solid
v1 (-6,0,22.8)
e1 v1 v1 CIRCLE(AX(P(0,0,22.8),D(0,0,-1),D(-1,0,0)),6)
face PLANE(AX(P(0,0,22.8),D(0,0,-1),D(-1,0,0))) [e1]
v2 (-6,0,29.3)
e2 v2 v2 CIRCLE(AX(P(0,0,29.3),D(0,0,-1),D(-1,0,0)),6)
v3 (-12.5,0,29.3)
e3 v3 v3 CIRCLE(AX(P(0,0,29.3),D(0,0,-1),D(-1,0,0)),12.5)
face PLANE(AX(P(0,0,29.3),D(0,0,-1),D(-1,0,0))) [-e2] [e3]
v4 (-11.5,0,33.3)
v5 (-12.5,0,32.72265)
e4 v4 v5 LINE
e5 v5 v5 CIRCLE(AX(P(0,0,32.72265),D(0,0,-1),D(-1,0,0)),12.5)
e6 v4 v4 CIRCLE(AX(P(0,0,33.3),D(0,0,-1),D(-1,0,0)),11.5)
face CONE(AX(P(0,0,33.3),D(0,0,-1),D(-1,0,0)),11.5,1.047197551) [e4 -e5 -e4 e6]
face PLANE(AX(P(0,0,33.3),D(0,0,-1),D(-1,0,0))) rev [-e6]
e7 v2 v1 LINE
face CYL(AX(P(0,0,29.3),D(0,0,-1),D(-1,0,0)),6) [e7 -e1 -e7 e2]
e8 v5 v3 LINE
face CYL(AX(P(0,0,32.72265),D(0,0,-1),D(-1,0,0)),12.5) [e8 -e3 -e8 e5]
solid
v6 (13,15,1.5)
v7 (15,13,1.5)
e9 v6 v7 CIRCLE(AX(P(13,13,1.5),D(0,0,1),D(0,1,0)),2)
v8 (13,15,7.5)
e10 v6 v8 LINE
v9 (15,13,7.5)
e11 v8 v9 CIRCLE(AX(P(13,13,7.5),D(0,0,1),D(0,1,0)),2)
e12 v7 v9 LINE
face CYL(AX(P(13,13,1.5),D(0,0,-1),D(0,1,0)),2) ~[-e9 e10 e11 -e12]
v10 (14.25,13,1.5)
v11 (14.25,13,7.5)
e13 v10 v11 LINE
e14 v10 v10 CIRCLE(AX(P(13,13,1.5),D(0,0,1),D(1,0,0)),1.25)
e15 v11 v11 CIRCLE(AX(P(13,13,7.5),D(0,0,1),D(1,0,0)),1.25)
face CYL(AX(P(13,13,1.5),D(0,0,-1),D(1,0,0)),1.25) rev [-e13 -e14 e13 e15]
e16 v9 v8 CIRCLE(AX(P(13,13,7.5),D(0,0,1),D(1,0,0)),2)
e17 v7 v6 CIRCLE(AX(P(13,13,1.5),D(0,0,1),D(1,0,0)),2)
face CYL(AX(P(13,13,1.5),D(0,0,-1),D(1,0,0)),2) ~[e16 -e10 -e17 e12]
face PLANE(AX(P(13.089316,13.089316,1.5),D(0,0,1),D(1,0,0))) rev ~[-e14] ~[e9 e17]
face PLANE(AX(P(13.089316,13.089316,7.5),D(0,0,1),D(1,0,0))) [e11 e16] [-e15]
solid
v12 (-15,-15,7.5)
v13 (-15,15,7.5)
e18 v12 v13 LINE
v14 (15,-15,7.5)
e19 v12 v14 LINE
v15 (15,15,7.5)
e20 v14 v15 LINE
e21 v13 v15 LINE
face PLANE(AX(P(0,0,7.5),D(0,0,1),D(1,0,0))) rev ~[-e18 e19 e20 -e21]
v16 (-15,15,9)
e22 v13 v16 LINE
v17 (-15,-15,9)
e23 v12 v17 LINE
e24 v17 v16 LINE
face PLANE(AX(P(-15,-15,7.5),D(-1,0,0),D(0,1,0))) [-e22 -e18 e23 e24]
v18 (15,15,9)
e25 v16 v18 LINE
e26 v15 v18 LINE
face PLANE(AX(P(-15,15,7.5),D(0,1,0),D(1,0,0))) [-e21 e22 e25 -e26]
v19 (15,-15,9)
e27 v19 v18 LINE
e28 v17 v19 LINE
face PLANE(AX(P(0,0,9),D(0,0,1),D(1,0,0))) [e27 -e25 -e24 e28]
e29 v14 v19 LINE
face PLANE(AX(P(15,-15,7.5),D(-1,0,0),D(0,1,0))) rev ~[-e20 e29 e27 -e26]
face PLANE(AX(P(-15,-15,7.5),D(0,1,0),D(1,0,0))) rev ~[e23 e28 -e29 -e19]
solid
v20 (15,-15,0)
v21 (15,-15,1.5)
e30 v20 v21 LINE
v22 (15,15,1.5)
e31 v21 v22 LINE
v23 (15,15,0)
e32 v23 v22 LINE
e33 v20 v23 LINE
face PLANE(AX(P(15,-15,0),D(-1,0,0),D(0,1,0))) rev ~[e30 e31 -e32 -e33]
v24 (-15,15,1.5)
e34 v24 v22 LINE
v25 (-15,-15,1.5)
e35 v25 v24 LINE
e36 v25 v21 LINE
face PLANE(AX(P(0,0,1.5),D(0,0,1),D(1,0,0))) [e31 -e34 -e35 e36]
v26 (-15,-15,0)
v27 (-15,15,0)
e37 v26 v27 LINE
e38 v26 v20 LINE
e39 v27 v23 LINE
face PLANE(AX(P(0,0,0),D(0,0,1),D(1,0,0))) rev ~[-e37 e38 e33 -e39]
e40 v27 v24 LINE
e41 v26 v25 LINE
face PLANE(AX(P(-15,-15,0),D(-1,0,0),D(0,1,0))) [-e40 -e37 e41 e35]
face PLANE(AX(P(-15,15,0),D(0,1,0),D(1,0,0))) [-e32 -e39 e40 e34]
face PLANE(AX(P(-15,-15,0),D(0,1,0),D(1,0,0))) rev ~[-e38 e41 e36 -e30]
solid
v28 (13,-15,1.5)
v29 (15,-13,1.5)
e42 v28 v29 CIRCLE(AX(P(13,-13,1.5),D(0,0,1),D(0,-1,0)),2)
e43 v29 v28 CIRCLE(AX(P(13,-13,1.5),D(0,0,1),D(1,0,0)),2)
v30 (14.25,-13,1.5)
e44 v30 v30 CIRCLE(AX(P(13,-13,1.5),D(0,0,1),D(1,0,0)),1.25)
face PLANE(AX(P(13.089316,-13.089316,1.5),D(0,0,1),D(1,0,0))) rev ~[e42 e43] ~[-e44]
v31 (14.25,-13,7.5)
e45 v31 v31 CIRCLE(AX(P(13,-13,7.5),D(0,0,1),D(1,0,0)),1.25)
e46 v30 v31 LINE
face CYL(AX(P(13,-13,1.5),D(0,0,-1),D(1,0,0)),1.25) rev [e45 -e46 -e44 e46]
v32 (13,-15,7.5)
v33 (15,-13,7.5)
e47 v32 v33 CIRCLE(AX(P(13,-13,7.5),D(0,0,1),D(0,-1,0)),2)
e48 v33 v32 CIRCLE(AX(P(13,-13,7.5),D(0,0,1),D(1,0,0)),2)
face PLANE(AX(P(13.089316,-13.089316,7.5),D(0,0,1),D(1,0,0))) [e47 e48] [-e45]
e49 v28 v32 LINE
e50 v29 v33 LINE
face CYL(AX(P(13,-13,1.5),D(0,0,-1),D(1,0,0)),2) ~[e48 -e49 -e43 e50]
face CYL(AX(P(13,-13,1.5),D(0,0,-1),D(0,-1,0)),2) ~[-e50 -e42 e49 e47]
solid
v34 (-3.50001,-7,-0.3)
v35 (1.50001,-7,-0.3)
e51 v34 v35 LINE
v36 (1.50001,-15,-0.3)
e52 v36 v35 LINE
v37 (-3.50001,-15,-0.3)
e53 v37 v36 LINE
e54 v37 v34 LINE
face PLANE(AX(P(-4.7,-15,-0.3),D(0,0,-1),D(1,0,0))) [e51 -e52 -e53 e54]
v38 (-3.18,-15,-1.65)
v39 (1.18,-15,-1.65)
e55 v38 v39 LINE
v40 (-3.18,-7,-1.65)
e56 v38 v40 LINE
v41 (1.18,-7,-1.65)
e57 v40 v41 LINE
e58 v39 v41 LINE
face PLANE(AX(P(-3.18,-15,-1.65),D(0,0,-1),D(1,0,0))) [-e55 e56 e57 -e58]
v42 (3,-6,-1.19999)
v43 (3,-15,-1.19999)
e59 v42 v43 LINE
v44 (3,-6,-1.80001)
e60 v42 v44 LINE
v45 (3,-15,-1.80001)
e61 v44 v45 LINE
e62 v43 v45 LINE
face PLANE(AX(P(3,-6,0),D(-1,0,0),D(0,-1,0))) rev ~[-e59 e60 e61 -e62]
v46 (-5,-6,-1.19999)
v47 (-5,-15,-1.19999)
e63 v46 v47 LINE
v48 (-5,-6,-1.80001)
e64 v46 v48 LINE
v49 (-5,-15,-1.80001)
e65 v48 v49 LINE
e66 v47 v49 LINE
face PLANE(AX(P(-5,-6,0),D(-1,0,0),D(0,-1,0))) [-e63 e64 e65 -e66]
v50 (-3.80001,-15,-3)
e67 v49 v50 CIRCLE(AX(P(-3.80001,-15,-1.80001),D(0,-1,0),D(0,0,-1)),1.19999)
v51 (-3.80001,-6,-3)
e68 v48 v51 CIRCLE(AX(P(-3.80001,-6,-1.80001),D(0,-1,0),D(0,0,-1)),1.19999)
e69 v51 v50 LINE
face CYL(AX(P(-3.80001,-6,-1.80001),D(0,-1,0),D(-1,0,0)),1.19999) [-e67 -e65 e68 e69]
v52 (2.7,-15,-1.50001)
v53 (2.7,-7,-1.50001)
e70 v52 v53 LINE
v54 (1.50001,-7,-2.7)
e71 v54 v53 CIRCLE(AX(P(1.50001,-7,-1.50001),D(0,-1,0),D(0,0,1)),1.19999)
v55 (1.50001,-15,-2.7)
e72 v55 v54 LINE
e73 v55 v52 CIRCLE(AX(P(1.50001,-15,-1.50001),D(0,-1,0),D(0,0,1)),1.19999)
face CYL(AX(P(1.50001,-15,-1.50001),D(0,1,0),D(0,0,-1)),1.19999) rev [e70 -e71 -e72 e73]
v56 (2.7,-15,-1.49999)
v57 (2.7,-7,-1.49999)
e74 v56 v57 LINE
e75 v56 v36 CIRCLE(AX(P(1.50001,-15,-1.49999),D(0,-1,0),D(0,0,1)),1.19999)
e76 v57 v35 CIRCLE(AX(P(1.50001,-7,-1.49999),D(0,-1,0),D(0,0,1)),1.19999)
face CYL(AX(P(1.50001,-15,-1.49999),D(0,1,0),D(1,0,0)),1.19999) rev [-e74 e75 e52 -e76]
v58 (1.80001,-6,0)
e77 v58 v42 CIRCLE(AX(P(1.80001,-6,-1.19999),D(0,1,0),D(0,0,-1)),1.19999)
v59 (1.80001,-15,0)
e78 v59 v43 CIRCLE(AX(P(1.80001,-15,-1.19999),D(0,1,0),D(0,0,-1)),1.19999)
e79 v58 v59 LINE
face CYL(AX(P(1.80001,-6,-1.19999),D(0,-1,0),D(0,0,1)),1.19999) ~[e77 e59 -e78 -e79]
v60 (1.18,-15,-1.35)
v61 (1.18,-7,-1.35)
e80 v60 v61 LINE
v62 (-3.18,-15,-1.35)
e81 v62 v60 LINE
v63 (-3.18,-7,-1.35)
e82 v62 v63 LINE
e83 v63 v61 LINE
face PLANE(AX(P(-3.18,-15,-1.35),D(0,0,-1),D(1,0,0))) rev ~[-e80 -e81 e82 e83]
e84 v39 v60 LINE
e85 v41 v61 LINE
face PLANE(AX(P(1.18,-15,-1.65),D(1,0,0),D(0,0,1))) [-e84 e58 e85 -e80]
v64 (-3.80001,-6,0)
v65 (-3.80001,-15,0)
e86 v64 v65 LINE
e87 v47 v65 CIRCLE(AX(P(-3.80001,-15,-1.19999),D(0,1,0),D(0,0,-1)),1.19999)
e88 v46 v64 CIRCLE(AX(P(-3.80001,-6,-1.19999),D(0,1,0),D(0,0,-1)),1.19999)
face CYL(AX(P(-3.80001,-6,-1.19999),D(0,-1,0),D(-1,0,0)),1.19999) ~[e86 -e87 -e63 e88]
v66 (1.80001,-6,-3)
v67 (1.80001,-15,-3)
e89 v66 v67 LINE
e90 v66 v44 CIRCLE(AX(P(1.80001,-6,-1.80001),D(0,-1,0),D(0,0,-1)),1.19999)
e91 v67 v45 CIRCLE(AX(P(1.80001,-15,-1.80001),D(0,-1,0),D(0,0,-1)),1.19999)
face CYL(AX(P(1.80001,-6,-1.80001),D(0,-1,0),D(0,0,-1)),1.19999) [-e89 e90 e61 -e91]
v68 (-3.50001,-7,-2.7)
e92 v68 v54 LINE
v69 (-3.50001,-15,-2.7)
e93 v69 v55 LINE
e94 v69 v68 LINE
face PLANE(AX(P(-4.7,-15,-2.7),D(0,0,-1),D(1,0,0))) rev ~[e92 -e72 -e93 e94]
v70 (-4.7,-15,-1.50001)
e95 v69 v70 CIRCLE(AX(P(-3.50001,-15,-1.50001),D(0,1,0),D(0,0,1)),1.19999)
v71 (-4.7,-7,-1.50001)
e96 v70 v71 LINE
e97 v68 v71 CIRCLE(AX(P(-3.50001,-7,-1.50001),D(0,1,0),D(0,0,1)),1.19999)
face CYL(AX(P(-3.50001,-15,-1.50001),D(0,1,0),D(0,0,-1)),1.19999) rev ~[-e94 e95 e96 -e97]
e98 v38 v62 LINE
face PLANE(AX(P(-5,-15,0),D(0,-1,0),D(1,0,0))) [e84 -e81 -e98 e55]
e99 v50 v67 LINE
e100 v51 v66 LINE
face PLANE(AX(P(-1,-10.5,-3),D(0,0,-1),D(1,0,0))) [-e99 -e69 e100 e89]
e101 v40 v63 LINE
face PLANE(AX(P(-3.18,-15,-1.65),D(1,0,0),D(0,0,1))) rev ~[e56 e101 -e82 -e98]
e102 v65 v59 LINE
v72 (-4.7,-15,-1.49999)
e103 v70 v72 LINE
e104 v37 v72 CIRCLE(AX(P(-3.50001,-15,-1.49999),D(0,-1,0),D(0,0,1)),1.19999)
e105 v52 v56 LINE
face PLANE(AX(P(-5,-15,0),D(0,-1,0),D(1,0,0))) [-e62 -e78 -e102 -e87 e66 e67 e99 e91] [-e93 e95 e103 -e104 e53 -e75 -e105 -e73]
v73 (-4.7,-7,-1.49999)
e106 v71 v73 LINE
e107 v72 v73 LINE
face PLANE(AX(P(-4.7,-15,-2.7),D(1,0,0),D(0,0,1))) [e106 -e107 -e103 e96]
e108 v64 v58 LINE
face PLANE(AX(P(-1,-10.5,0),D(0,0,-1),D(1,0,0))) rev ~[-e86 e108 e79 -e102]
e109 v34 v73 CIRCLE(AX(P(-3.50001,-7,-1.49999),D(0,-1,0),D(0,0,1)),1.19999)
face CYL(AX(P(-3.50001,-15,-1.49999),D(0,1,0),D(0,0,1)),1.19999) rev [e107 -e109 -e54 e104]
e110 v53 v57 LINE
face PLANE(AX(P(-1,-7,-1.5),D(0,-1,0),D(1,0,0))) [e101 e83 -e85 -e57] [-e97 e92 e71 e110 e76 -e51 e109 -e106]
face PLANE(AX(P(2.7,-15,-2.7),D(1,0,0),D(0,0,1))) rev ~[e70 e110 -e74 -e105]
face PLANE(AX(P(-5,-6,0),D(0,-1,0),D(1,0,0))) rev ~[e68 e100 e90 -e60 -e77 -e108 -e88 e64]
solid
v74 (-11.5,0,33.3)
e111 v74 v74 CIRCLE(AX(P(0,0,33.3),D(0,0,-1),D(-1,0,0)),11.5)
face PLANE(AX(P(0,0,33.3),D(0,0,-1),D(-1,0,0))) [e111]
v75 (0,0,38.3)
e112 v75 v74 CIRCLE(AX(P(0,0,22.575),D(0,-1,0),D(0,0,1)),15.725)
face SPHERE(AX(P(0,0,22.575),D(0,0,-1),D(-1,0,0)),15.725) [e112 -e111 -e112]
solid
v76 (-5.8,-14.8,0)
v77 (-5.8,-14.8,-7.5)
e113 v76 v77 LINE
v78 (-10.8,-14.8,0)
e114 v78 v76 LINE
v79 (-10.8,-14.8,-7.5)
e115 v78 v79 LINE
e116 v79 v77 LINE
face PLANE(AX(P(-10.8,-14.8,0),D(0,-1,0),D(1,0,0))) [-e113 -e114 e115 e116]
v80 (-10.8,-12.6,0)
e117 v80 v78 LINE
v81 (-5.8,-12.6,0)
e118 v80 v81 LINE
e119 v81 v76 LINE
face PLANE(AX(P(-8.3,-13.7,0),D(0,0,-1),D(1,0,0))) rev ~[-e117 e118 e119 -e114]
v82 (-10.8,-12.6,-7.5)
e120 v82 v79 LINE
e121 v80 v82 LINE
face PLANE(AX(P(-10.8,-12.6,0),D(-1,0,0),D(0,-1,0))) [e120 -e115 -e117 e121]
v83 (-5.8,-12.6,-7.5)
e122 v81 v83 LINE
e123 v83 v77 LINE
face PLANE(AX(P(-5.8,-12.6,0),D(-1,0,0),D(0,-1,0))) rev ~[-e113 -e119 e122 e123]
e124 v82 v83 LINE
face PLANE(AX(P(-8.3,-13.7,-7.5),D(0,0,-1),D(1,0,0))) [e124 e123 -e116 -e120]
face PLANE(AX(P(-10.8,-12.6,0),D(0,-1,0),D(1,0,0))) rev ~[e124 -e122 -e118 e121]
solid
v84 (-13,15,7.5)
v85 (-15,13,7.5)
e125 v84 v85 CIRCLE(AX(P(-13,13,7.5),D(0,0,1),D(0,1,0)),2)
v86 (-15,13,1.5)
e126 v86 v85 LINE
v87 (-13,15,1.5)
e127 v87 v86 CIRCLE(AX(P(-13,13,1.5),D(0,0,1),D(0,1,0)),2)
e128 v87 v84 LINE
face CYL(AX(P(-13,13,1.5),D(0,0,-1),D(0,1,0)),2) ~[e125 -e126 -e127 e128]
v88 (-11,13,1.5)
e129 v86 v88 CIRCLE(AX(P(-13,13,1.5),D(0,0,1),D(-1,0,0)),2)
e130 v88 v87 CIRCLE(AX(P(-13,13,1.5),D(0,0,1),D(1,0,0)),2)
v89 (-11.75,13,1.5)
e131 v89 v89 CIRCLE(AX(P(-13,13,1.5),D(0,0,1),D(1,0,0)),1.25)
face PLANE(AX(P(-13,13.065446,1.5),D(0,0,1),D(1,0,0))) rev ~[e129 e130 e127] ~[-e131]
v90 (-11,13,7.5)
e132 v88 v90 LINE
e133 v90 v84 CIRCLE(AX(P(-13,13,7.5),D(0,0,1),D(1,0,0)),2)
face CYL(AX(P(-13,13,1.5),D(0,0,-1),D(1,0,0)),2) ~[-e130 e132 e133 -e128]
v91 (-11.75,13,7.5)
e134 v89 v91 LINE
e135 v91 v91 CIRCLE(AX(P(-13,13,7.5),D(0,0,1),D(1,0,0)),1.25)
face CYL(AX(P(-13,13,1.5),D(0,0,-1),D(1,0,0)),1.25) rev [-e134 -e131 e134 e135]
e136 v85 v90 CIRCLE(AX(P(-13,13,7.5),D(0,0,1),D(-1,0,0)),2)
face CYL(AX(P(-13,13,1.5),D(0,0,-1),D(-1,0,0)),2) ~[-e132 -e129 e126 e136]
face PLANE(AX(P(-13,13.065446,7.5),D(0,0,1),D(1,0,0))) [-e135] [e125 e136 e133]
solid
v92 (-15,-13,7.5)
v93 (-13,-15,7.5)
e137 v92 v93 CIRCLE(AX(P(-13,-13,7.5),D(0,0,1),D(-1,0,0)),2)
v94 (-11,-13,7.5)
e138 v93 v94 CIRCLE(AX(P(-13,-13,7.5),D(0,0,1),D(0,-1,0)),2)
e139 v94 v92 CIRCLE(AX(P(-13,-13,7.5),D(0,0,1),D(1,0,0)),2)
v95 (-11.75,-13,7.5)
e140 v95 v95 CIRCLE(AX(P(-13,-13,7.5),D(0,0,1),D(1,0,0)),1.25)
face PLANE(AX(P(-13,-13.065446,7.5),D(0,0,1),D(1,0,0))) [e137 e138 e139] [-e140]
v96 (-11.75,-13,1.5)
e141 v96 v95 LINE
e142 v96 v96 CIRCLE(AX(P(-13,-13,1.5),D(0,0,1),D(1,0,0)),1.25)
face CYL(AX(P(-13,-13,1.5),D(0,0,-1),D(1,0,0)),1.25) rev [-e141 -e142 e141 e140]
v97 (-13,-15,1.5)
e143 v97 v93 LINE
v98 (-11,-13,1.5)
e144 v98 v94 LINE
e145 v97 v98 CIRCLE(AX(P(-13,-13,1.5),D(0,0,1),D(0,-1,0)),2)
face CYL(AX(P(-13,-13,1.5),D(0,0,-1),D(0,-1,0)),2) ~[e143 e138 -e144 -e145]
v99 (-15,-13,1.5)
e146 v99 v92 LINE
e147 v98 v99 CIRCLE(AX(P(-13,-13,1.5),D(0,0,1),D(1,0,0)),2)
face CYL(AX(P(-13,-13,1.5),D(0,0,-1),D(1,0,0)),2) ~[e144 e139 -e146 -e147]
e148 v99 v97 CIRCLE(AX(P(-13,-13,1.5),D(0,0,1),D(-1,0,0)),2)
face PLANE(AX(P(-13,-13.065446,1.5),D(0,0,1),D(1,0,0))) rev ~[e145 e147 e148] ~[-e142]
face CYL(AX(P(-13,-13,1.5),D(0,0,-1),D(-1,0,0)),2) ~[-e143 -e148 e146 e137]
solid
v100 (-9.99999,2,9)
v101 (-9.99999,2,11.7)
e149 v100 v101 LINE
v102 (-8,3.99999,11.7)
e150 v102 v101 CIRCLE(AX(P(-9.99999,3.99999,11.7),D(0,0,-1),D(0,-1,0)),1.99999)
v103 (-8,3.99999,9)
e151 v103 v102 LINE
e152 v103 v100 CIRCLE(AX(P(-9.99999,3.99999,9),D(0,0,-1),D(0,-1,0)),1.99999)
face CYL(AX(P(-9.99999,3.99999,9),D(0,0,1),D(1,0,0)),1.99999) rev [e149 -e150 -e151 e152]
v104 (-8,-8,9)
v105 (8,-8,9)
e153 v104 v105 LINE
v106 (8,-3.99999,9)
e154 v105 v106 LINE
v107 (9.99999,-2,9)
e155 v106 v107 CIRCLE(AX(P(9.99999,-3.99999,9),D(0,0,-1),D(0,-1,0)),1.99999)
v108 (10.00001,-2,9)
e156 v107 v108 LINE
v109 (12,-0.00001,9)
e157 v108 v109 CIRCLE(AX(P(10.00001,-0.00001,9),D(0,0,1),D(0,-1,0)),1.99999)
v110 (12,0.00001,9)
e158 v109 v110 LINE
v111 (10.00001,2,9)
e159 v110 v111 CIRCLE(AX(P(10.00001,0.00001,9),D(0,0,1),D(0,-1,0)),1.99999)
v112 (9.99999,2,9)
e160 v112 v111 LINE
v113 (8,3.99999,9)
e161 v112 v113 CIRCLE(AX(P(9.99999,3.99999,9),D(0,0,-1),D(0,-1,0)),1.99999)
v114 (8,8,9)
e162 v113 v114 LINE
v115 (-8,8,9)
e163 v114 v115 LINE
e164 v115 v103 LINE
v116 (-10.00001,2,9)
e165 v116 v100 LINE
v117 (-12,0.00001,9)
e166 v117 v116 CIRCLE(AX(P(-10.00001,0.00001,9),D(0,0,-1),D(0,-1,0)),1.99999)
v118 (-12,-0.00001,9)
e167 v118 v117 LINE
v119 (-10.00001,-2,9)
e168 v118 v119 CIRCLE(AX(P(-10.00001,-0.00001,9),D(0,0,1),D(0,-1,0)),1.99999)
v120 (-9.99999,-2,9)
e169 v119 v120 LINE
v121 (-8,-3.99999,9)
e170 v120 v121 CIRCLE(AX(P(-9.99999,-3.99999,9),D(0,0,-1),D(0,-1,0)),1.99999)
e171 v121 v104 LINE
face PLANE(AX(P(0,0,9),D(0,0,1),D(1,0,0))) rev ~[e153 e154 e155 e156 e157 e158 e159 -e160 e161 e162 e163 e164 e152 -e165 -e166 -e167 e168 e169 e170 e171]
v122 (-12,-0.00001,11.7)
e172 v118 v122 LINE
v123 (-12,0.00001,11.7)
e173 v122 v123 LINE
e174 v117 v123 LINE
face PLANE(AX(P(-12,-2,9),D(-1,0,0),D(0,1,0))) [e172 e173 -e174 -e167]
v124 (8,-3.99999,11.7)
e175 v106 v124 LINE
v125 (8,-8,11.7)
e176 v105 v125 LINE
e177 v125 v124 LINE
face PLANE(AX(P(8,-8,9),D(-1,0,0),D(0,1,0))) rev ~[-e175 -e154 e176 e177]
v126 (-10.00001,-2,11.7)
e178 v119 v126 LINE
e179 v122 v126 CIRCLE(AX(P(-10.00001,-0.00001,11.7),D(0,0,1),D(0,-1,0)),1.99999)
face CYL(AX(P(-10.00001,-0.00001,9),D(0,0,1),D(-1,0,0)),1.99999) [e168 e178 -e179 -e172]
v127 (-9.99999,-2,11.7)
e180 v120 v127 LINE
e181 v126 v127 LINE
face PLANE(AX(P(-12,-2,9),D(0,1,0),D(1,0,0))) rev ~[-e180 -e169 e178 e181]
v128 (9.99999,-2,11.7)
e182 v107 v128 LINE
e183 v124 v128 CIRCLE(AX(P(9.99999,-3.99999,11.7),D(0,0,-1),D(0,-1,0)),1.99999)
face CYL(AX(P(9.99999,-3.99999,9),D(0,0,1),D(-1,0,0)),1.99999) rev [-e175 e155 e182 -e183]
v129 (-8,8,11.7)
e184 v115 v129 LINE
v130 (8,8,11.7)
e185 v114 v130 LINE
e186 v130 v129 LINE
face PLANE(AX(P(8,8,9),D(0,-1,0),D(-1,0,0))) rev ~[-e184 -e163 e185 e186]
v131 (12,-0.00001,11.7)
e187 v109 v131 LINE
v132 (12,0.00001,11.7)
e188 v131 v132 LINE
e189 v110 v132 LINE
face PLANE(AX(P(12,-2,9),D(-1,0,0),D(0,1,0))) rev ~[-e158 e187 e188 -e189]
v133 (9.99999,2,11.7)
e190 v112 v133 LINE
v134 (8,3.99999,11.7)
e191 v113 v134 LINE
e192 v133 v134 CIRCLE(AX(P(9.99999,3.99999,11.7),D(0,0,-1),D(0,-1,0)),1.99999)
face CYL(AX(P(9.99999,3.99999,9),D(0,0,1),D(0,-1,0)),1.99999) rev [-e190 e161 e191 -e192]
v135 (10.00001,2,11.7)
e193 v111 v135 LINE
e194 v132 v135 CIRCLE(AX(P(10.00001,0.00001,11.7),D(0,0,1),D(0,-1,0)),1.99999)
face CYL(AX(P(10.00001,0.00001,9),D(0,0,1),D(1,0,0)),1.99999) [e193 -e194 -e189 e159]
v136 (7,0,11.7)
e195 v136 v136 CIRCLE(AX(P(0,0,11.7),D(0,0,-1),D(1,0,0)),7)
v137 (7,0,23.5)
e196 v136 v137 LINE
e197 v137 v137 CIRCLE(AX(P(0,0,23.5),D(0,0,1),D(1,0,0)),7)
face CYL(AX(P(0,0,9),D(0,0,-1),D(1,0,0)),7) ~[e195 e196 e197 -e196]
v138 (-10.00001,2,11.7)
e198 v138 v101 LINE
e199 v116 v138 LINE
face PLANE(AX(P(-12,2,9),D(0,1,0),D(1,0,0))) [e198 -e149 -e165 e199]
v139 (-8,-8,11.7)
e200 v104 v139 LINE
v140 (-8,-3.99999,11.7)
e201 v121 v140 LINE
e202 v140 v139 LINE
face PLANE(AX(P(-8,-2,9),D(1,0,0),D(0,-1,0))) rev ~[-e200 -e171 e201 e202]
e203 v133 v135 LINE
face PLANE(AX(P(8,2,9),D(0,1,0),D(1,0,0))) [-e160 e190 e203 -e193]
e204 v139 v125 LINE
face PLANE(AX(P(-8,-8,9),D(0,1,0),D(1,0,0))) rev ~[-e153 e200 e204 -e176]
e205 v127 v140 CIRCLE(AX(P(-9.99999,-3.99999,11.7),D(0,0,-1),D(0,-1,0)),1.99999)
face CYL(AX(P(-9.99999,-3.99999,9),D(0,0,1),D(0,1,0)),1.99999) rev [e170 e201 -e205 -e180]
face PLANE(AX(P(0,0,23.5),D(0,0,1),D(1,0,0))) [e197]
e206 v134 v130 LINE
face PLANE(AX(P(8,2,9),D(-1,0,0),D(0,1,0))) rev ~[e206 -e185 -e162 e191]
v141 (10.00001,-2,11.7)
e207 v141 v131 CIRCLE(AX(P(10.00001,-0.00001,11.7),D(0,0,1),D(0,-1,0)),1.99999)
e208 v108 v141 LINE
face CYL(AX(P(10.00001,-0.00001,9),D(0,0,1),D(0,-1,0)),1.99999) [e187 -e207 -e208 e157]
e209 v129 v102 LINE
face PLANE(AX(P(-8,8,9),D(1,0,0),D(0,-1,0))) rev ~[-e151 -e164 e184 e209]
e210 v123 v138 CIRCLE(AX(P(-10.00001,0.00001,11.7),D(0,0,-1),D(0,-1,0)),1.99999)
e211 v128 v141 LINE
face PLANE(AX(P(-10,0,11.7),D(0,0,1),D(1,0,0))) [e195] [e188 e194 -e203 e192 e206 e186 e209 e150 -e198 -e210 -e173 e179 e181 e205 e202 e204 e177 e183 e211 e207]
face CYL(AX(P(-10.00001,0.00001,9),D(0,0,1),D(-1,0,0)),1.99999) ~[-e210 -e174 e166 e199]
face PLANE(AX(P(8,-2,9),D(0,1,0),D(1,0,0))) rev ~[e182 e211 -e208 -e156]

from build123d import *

# Parameters (mm, degrees)
F0_W      = 30
F0_H      = 30
F1_DEPTH  = 1.5
F2_START  = 6
F1_FACE_W = 30
F1_FACE_H = 30
F2_DEPTH  = 1.5
F3_R      = 1.25
F4_DEPTH  = 6
F5_W      = 4
F5_H      = 4
F5_R      = 7
F6_DEPTH  = 2.7
F7_R      = 1.99999
F8_DEPTH  = 14.5
F9_W      = 6
F9_H      = 1.5
F9_H_2    = 5
F12_W     = 8
F12_H     = 9
F13_DEPTH = 3
F14_W     = 7.4
F14_H     = 2.4
F14_W_2   = 4.36
F14_H_2   = 0.3
F15_DEPTH = 8
F16_R     = 1.19999
F17_W     = 5
F17_H     = 2.2
F18_DEPTH = 7.5


# Not quite as in the source:
# - a fillet or chamfer is up to 0.001 mm smaller than in the source, because OpenCascade refuses the exact size


with BuildPart() as f1:
    # F0 (on Top) → F1 (new body)
    with BuildSketch(Plane.XY):
        Rectangle(F0_W, F0_H)
    extrude(amount=F1_DEPTH)


with BuildPart() as f2:
    # F1_face (on face) → F2 (new body)
    with BuildSketch(Plane.XY.offset(1.5).offset(F2_START)):
        Rectangle(F1_FACE_W, F1_FACE_H)
    extrude(amount=F2_DEPTH)


with BuildPart() as f4:
    # F3 (on face) → F4 (new body)
    with BuildSketch(Plane.XY.offset(1.5)):
        with BuildLine():
            ThreePointArc((-11, 13), (-11.5857864376, 14.4142135624), (-13, 15))
            ThreePointArc((-13, 15), (-14.4142135624, 14.4142135624), (-15, 13))
            ThreePointArc((-15, 13), (-13, 11), (-11, 13))
        make_face()
        with Locations((-13, 13)):
            Circle(F3_R, mode=Mode.SUBTRACT)
    extrude(amount=F4_DEPTH)


with BuildPart() as f4b:
    # F3 (on face) → F4, piece 2 (new body)
    with BuildSketch(Plane.XY.offset(1.5)):
        with BuildLine():
            ThreePointArc((-15, -13), (-14.4142135624, -14.4142135624), (-13, -15))
            ThreePointArc((-13, -15), (-11.5857864376, -14.4142135624), (-11, -13))
            ThreePointArc((-11, -13), (-13, -11), (-15, -13))
        make_face()
        with Locations((-13, -13)):
            Circle(F3_R, mode=Mode.SUBTRACT)
    extrude(amount=F4_DEPTH)


with BuildPart() as f4c:
    # F3 (on face) → F4, piece 3 (new body)
    with BuildSketch(Plane.XY.offset(1.5)):
        with BuildLine():
            ThreePointArc((13, -15), (14.4142135624, -14.4142135624), (15, -13))
            ThreePointArc((15, -13), (11.5857864376, -11.5857864376), (13, -15))
        make_face()
        with Locations((13, -13)):
            Circle(F3_R, mode=Mode.SUBTRACT)
    extrude(amount=F4_DEPTH)


with BuildPart() as f4d:
    # F3 (on face) → F4, piece 4 (new body)
    with BuildSketch(Plane.XY.offset(1.5)):
        with BuildLine():
            ThreePointArc((13, 15), (11.5857864376, 11.5857864376), (15, 13))
            ThreePointArc((15, 13), (14.4142135624, 14.4142135624), (13, 15))
        make_face()
        with Locations((13, 13)):
            Circle(F3_R, mode=Mode.SUBTRACT)
    extrude(amount=F4_DEPTH)


with BuildPart() as f6:
    # F5 (on face) → F6 (new body)
    with BuildSketch(Plane.XY.offset(9)):
        with Locations((-10, 0)):
            Rectangle(F5_W, F5_H)
        Polygon((-8, -8), (8, -8), (8, -2), (8, 2), (8, 8), (-8, 8), (-8, 2), (-8, -2), align=None)
        Circle(F5_R, mode=Mode.SUBTRACT)
        with Locations((10, 0)):
            Rectangle(F5_W, F5_H)
        Circle(F5_R)
    extrude(amount=F6_DEPTH)

    # F7 (radius 2 in the source; OpenCascade refuses exactly that, so slightly less here)
    f7_edges = [f6.edges().sort_by_distance(p)[0] for p in [
        (-12, 2, 10.35),
        (-12, -2, 10.35),
        (-8, 2, 10.35),
        (-8, -2, 10.35),
        (12, -2, 10.35),
        (8, -2, 10.35),
        (8, 2, 10.35),
        (12, 2, 10.35),
    ]]
    fillet(f7_edges, radius=F7_R)

    # F5 (on face) → F8 (join)
    with BuildSketch(Plane.XY.offset(9)):
        Circle(F5_R)
    extrude(amount=F8_DEPTH)


with BuildPart() as f10:
    # F9 (on Front) → F10 (revolve)
    with BuildSketch(Plane.XZ):
        with BuildLine():
            Line((-11.5, 33.3), (0, 33.3))
            Line((0, 33.3), (0, 38.3))
            ThreePointArc((0, 38.3), (-6.269968102, 36.9959266346), (-11.5, 33.3))
        make_face()
    revolve(axis=Axis((0, 0, 25.3), (0, 0, -1)))


with BuildPart() as f11:
    # F9 (on Front) → F11 (revolve)
    with BuildSketch(Plane.XZ):
        Polygon((-6, 29.3), (0, 29.3), (0, 33.3), (-11.5, 33.3), (-12.5, 32.7226497308), (-12.5, 29.3), align=None)
        with Locations((-3, 28.55)):
            Rectangle(F9_W, F9_H)
        with Locations((-3, 25.3)):
            Rectangle(F9_W, F9_H_2)
    revolve(axis=Axis((0, 0, 25.3), (0, 0, -1)))


with BuildPart() as f13:
    # F12 (on face) → F13 (new body)
    with BuildSketch(Plane(origin=(0, 0, 0), x_dir=(1, 0, 0), z_dir=(0, 0, -1))):
        with Locations((-1, 10.5)):
            Rectangle(F12_W, F12_H)
    extrude(amount=F13_DEPTH)

    # F14 (on face) → F15 (cut)
    with BuildSketch(Plane.XZ.offset(15)):
        with Locations((-1, -1.5)):
            Rectangle(F14_W, F14_H)
        with Locations((-1, -1.5)):
            Rectangle(F14_W_2, F14_H_2, mode=Mode.SUBTRACT)
    extrude(amount=-F15_DEPTH, mode=Mode.SUBTRACT)

    # F16 (radius 1.2 in the source; OpenCascade refuses exactly that, so slightly less here)
    f16_edges = [f13.edges().sort_by_distance(p)[0] for p in [
        (-5, -10.5, -3),
        (-5, -10.5, 0),
        (3, -10.5, 0),
        (3, -10.5, -3),
        (-4.7, -11, -0.3),
        (2.7, -11, -0.3),
        (2.7, -11, -2.7),
        (-4.7, -11, -2.7),
    ]]
    fillet(f16_edges, radius=F16_R)


with BuildPart() as f18:
    # F17 (on face) → F18 (new body)
    with BuildSketch(Plane(origin=(0, 0, 0), x_dir=(1, 0, 0), z_dir=(0, 0, -1))):
        with Locations((-8.3, 13.7)):
            Rectangle(F17_W, F17_H)
    extrude(amount=F18_DEPTH)


solid = Compound([f1.part, f2.part, f4.part, f4b.part, f4c.part, f4d.part, f6.part, f10.part, f11.part, f13.part, f18.part])
